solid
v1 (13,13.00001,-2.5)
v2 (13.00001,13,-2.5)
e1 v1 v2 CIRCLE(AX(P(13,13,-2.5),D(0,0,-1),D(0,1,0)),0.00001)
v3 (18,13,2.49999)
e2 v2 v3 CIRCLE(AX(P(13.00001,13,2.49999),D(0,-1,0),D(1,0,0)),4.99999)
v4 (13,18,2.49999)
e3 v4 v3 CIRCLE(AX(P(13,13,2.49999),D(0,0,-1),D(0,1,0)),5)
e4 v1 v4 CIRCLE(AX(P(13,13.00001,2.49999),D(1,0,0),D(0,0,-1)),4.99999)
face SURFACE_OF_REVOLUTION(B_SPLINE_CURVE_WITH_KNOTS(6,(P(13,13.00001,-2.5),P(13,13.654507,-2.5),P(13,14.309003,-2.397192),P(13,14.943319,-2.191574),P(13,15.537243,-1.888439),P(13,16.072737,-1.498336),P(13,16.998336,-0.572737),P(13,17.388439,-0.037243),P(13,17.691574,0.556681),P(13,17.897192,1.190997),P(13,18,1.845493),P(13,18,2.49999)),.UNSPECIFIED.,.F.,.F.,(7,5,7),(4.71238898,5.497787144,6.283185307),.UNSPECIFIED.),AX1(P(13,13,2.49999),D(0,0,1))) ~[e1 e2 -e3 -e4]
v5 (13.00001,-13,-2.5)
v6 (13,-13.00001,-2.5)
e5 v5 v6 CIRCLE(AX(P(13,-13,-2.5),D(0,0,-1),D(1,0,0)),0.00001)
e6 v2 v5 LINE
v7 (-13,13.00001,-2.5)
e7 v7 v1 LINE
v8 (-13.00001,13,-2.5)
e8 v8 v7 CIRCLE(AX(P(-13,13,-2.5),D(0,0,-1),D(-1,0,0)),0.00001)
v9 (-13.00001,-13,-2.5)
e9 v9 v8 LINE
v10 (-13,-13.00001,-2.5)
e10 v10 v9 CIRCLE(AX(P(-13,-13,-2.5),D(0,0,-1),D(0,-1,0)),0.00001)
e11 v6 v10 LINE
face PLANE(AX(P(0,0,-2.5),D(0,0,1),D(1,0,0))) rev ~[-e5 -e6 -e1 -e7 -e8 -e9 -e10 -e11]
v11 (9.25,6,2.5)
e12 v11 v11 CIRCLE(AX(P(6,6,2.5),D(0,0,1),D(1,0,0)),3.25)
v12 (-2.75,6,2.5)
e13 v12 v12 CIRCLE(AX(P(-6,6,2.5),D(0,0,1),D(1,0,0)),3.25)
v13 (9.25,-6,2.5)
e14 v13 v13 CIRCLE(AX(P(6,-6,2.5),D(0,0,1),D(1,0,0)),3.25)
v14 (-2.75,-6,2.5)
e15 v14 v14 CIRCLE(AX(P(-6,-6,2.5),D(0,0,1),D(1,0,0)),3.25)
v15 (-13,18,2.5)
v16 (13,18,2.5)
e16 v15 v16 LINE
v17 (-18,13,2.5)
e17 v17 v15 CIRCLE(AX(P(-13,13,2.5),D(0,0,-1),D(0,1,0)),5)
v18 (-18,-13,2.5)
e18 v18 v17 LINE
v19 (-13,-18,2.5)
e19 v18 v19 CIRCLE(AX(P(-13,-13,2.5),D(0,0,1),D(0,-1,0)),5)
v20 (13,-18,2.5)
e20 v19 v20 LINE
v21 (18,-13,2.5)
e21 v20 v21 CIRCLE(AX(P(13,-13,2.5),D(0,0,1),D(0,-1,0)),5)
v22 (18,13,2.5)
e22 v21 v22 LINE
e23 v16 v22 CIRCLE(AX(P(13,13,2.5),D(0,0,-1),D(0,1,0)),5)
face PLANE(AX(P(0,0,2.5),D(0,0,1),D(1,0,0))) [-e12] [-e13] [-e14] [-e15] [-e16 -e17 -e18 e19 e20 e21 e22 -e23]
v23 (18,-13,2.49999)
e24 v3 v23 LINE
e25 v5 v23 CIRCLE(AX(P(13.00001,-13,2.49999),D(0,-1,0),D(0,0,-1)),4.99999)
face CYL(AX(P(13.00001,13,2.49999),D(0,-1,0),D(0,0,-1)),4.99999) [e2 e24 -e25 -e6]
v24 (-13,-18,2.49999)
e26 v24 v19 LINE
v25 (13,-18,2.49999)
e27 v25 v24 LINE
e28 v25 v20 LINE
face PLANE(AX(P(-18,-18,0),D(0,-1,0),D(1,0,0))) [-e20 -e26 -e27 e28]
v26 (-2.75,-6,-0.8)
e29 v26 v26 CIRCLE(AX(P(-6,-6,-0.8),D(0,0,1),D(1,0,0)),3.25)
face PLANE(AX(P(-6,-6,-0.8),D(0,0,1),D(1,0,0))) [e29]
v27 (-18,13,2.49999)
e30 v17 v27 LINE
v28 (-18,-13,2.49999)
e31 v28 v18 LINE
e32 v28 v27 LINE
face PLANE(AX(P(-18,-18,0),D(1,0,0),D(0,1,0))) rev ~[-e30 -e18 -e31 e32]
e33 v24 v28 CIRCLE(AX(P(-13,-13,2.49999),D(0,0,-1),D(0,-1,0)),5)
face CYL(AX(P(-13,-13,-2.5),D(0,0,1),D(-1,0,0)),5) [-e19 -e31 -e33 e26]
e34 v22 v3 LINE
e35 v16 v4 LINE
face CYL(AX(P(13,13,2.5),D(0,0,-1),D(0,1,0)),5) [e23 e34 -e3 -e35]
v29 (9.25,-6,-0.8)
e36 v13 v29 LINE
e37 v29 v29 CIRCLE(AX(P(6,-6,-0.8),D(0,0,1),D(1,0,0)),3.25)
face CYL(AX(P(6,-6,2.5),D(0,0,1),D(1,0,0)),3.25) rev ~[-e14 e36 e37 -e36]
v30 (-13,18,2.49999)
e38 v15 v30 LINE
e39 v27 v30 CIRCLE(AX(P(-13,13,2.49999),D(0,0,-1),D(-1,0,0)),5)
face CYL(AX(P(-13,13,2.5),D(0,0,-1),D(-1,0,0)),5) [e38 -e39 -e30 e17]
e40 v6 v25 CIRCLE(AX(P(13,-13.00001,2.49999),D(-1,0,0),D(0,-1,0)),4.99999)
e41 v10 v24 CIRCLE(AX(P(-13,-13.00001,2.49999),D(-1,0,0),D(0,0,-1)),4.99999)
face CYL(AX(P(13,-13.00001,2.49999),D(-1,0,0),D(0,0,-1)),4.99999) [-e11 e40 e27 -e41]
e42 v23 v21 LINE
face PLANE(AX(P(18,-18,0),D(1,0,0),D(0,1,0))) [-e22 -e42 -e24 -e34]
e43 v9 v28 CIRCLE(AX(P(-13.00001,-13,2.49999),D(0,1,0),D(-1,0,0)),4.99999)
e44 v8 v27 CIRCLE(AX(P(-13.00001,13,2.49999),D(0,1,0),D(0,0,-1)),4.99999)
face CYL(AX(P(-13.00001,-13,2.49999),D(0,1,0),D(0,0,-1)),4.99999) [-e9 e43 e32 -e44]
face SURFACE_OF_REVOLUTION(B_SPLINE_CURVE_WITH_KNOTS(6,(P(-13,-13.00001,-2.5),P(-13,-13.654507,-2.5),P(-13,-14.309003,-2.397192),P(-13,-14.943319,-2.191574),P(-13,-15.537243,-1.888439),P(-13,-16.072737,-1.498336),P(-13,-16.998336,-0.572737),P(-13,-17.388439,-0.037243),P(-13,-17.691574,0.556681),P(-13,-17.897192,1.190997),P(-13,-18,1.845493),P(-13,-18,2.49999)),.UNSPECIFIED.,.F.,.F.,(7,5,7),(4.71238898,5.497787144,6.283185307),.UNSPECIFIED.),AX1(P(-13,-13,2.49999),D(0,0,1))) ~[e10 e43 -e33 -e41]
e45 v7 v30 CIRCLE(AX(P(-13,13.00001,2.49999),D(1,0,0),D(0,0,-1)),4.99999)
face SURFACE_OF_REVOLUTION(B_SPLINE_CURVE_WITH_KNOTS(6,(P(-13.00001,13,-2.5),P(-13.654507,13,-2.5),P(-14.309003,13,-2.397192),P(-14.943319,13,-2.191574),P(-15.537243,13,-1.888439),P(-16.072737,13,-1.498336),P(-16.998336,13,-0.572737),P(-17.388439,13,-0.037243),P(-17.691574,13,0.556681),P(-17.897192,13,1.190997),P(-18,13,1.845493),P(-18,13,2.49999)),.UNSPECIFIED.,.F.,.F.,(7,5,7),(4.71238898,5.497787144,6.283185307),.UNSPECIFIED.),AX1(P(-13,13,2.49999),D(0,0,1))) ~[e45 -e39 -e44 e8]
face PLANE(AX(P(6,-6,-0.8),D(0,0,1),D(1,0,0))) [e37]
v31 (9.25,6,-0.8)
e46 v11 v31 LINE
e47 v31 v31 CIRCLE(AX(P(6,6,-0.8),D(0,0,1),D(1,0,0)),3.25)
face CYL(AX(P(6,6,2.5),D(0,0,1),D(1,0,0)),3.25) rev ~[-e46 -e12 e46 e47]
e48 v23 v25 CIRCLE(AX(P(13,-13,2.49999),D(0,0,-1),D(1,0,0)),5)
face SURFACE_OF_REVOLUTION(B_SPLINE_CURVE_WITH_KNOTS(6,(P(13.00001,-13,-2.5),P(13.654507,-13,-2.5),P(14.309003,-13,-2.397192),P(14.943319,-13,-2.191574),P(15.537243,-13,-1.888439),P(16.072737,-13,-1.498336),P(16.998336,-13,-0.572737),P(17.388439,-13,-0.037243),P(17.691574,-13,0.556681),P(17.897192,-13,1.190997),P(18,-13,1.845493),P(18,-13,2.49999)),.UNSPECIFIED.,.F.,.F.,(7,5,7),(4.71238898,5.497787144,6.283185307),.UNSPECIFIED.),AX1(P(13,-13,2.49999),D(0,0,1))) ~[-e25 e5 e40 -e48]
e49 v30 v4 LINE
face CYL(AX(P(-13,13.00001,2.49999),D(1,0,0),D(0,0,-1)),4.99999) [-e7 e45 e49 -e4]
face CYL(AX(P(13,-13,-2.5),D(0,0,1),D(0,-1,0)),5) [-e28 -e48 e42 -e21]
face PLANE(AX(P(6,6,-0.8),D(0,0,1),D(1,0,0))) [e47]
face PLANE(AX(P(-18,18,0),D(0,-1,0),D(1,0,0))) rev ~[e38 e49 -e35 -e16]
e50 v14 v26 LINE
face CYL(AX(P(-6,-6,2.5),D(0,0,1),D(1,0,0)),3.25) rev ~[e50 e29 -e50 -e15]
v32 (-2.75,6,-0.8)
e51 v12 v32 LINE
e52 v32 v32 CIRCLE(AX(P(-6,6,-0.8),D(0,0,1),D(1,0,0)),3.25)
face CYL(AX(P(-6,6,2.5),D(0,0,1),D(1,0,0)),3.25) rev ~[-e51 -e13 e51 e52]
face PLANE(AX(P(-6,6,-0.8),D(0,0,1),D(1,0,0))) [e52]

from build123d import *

# Parameters (mm, degrees)
F0_W     = 36
F0_H     = 36
F1_DEPTH = 2.5
F2_R     = 3.25
F3_DEPTH = 3.3
F4_R     = 5
F5_R     = 4.99999


# Not quite as in the source:
# - a fillet or chamfer is up to 0.001 mm smaller than in the source, because OpenCascade refuses the exact size


with BuildPart() as f1:
    # F0 (on Top) → F1 (new body, symmetric)
    with BuildSketch(Plane.XY):
        Rectangle(F0_W, F0_H)
    extrude(amount=F1_DEPTH, both=True)

    # F2 (on face) → F3 (cut)
    with BuildSketch(Plane.XY.offset(2.5)):
        with Locations((-6, 6)):
            Circle(F2_R)
        with Locations((6, 6)):
            Circle(F2_R)
        with Locations((6, -6)):
            Circle(F2_R)
        with Locations((-6, -6)):
            Circle(F2_R)
    extrude(amount=-F3_DEPTH, mode=Mode.SUBTRACT)

    # F4
    f4_edges = [f1.edges().sort_by_distance(p)[0] for p in [
        (-18, -18, 0),
        (-18, 18, 0),
        (18, -18, 0),
        (18, 18, 0),
    ]]
    fillet(f4_edges, radius=F4_R)

    # F5 (radius 5 in the source; OpenCascade refuses exactly that, so slightly less here)
    f5_edges = [f1.edges().sort_by_distance(p)[0] for p in [
        (0, 18, -2.5),
    ]]
    fillet(f5_edges, radius=F5_R)


solid = f1.part
